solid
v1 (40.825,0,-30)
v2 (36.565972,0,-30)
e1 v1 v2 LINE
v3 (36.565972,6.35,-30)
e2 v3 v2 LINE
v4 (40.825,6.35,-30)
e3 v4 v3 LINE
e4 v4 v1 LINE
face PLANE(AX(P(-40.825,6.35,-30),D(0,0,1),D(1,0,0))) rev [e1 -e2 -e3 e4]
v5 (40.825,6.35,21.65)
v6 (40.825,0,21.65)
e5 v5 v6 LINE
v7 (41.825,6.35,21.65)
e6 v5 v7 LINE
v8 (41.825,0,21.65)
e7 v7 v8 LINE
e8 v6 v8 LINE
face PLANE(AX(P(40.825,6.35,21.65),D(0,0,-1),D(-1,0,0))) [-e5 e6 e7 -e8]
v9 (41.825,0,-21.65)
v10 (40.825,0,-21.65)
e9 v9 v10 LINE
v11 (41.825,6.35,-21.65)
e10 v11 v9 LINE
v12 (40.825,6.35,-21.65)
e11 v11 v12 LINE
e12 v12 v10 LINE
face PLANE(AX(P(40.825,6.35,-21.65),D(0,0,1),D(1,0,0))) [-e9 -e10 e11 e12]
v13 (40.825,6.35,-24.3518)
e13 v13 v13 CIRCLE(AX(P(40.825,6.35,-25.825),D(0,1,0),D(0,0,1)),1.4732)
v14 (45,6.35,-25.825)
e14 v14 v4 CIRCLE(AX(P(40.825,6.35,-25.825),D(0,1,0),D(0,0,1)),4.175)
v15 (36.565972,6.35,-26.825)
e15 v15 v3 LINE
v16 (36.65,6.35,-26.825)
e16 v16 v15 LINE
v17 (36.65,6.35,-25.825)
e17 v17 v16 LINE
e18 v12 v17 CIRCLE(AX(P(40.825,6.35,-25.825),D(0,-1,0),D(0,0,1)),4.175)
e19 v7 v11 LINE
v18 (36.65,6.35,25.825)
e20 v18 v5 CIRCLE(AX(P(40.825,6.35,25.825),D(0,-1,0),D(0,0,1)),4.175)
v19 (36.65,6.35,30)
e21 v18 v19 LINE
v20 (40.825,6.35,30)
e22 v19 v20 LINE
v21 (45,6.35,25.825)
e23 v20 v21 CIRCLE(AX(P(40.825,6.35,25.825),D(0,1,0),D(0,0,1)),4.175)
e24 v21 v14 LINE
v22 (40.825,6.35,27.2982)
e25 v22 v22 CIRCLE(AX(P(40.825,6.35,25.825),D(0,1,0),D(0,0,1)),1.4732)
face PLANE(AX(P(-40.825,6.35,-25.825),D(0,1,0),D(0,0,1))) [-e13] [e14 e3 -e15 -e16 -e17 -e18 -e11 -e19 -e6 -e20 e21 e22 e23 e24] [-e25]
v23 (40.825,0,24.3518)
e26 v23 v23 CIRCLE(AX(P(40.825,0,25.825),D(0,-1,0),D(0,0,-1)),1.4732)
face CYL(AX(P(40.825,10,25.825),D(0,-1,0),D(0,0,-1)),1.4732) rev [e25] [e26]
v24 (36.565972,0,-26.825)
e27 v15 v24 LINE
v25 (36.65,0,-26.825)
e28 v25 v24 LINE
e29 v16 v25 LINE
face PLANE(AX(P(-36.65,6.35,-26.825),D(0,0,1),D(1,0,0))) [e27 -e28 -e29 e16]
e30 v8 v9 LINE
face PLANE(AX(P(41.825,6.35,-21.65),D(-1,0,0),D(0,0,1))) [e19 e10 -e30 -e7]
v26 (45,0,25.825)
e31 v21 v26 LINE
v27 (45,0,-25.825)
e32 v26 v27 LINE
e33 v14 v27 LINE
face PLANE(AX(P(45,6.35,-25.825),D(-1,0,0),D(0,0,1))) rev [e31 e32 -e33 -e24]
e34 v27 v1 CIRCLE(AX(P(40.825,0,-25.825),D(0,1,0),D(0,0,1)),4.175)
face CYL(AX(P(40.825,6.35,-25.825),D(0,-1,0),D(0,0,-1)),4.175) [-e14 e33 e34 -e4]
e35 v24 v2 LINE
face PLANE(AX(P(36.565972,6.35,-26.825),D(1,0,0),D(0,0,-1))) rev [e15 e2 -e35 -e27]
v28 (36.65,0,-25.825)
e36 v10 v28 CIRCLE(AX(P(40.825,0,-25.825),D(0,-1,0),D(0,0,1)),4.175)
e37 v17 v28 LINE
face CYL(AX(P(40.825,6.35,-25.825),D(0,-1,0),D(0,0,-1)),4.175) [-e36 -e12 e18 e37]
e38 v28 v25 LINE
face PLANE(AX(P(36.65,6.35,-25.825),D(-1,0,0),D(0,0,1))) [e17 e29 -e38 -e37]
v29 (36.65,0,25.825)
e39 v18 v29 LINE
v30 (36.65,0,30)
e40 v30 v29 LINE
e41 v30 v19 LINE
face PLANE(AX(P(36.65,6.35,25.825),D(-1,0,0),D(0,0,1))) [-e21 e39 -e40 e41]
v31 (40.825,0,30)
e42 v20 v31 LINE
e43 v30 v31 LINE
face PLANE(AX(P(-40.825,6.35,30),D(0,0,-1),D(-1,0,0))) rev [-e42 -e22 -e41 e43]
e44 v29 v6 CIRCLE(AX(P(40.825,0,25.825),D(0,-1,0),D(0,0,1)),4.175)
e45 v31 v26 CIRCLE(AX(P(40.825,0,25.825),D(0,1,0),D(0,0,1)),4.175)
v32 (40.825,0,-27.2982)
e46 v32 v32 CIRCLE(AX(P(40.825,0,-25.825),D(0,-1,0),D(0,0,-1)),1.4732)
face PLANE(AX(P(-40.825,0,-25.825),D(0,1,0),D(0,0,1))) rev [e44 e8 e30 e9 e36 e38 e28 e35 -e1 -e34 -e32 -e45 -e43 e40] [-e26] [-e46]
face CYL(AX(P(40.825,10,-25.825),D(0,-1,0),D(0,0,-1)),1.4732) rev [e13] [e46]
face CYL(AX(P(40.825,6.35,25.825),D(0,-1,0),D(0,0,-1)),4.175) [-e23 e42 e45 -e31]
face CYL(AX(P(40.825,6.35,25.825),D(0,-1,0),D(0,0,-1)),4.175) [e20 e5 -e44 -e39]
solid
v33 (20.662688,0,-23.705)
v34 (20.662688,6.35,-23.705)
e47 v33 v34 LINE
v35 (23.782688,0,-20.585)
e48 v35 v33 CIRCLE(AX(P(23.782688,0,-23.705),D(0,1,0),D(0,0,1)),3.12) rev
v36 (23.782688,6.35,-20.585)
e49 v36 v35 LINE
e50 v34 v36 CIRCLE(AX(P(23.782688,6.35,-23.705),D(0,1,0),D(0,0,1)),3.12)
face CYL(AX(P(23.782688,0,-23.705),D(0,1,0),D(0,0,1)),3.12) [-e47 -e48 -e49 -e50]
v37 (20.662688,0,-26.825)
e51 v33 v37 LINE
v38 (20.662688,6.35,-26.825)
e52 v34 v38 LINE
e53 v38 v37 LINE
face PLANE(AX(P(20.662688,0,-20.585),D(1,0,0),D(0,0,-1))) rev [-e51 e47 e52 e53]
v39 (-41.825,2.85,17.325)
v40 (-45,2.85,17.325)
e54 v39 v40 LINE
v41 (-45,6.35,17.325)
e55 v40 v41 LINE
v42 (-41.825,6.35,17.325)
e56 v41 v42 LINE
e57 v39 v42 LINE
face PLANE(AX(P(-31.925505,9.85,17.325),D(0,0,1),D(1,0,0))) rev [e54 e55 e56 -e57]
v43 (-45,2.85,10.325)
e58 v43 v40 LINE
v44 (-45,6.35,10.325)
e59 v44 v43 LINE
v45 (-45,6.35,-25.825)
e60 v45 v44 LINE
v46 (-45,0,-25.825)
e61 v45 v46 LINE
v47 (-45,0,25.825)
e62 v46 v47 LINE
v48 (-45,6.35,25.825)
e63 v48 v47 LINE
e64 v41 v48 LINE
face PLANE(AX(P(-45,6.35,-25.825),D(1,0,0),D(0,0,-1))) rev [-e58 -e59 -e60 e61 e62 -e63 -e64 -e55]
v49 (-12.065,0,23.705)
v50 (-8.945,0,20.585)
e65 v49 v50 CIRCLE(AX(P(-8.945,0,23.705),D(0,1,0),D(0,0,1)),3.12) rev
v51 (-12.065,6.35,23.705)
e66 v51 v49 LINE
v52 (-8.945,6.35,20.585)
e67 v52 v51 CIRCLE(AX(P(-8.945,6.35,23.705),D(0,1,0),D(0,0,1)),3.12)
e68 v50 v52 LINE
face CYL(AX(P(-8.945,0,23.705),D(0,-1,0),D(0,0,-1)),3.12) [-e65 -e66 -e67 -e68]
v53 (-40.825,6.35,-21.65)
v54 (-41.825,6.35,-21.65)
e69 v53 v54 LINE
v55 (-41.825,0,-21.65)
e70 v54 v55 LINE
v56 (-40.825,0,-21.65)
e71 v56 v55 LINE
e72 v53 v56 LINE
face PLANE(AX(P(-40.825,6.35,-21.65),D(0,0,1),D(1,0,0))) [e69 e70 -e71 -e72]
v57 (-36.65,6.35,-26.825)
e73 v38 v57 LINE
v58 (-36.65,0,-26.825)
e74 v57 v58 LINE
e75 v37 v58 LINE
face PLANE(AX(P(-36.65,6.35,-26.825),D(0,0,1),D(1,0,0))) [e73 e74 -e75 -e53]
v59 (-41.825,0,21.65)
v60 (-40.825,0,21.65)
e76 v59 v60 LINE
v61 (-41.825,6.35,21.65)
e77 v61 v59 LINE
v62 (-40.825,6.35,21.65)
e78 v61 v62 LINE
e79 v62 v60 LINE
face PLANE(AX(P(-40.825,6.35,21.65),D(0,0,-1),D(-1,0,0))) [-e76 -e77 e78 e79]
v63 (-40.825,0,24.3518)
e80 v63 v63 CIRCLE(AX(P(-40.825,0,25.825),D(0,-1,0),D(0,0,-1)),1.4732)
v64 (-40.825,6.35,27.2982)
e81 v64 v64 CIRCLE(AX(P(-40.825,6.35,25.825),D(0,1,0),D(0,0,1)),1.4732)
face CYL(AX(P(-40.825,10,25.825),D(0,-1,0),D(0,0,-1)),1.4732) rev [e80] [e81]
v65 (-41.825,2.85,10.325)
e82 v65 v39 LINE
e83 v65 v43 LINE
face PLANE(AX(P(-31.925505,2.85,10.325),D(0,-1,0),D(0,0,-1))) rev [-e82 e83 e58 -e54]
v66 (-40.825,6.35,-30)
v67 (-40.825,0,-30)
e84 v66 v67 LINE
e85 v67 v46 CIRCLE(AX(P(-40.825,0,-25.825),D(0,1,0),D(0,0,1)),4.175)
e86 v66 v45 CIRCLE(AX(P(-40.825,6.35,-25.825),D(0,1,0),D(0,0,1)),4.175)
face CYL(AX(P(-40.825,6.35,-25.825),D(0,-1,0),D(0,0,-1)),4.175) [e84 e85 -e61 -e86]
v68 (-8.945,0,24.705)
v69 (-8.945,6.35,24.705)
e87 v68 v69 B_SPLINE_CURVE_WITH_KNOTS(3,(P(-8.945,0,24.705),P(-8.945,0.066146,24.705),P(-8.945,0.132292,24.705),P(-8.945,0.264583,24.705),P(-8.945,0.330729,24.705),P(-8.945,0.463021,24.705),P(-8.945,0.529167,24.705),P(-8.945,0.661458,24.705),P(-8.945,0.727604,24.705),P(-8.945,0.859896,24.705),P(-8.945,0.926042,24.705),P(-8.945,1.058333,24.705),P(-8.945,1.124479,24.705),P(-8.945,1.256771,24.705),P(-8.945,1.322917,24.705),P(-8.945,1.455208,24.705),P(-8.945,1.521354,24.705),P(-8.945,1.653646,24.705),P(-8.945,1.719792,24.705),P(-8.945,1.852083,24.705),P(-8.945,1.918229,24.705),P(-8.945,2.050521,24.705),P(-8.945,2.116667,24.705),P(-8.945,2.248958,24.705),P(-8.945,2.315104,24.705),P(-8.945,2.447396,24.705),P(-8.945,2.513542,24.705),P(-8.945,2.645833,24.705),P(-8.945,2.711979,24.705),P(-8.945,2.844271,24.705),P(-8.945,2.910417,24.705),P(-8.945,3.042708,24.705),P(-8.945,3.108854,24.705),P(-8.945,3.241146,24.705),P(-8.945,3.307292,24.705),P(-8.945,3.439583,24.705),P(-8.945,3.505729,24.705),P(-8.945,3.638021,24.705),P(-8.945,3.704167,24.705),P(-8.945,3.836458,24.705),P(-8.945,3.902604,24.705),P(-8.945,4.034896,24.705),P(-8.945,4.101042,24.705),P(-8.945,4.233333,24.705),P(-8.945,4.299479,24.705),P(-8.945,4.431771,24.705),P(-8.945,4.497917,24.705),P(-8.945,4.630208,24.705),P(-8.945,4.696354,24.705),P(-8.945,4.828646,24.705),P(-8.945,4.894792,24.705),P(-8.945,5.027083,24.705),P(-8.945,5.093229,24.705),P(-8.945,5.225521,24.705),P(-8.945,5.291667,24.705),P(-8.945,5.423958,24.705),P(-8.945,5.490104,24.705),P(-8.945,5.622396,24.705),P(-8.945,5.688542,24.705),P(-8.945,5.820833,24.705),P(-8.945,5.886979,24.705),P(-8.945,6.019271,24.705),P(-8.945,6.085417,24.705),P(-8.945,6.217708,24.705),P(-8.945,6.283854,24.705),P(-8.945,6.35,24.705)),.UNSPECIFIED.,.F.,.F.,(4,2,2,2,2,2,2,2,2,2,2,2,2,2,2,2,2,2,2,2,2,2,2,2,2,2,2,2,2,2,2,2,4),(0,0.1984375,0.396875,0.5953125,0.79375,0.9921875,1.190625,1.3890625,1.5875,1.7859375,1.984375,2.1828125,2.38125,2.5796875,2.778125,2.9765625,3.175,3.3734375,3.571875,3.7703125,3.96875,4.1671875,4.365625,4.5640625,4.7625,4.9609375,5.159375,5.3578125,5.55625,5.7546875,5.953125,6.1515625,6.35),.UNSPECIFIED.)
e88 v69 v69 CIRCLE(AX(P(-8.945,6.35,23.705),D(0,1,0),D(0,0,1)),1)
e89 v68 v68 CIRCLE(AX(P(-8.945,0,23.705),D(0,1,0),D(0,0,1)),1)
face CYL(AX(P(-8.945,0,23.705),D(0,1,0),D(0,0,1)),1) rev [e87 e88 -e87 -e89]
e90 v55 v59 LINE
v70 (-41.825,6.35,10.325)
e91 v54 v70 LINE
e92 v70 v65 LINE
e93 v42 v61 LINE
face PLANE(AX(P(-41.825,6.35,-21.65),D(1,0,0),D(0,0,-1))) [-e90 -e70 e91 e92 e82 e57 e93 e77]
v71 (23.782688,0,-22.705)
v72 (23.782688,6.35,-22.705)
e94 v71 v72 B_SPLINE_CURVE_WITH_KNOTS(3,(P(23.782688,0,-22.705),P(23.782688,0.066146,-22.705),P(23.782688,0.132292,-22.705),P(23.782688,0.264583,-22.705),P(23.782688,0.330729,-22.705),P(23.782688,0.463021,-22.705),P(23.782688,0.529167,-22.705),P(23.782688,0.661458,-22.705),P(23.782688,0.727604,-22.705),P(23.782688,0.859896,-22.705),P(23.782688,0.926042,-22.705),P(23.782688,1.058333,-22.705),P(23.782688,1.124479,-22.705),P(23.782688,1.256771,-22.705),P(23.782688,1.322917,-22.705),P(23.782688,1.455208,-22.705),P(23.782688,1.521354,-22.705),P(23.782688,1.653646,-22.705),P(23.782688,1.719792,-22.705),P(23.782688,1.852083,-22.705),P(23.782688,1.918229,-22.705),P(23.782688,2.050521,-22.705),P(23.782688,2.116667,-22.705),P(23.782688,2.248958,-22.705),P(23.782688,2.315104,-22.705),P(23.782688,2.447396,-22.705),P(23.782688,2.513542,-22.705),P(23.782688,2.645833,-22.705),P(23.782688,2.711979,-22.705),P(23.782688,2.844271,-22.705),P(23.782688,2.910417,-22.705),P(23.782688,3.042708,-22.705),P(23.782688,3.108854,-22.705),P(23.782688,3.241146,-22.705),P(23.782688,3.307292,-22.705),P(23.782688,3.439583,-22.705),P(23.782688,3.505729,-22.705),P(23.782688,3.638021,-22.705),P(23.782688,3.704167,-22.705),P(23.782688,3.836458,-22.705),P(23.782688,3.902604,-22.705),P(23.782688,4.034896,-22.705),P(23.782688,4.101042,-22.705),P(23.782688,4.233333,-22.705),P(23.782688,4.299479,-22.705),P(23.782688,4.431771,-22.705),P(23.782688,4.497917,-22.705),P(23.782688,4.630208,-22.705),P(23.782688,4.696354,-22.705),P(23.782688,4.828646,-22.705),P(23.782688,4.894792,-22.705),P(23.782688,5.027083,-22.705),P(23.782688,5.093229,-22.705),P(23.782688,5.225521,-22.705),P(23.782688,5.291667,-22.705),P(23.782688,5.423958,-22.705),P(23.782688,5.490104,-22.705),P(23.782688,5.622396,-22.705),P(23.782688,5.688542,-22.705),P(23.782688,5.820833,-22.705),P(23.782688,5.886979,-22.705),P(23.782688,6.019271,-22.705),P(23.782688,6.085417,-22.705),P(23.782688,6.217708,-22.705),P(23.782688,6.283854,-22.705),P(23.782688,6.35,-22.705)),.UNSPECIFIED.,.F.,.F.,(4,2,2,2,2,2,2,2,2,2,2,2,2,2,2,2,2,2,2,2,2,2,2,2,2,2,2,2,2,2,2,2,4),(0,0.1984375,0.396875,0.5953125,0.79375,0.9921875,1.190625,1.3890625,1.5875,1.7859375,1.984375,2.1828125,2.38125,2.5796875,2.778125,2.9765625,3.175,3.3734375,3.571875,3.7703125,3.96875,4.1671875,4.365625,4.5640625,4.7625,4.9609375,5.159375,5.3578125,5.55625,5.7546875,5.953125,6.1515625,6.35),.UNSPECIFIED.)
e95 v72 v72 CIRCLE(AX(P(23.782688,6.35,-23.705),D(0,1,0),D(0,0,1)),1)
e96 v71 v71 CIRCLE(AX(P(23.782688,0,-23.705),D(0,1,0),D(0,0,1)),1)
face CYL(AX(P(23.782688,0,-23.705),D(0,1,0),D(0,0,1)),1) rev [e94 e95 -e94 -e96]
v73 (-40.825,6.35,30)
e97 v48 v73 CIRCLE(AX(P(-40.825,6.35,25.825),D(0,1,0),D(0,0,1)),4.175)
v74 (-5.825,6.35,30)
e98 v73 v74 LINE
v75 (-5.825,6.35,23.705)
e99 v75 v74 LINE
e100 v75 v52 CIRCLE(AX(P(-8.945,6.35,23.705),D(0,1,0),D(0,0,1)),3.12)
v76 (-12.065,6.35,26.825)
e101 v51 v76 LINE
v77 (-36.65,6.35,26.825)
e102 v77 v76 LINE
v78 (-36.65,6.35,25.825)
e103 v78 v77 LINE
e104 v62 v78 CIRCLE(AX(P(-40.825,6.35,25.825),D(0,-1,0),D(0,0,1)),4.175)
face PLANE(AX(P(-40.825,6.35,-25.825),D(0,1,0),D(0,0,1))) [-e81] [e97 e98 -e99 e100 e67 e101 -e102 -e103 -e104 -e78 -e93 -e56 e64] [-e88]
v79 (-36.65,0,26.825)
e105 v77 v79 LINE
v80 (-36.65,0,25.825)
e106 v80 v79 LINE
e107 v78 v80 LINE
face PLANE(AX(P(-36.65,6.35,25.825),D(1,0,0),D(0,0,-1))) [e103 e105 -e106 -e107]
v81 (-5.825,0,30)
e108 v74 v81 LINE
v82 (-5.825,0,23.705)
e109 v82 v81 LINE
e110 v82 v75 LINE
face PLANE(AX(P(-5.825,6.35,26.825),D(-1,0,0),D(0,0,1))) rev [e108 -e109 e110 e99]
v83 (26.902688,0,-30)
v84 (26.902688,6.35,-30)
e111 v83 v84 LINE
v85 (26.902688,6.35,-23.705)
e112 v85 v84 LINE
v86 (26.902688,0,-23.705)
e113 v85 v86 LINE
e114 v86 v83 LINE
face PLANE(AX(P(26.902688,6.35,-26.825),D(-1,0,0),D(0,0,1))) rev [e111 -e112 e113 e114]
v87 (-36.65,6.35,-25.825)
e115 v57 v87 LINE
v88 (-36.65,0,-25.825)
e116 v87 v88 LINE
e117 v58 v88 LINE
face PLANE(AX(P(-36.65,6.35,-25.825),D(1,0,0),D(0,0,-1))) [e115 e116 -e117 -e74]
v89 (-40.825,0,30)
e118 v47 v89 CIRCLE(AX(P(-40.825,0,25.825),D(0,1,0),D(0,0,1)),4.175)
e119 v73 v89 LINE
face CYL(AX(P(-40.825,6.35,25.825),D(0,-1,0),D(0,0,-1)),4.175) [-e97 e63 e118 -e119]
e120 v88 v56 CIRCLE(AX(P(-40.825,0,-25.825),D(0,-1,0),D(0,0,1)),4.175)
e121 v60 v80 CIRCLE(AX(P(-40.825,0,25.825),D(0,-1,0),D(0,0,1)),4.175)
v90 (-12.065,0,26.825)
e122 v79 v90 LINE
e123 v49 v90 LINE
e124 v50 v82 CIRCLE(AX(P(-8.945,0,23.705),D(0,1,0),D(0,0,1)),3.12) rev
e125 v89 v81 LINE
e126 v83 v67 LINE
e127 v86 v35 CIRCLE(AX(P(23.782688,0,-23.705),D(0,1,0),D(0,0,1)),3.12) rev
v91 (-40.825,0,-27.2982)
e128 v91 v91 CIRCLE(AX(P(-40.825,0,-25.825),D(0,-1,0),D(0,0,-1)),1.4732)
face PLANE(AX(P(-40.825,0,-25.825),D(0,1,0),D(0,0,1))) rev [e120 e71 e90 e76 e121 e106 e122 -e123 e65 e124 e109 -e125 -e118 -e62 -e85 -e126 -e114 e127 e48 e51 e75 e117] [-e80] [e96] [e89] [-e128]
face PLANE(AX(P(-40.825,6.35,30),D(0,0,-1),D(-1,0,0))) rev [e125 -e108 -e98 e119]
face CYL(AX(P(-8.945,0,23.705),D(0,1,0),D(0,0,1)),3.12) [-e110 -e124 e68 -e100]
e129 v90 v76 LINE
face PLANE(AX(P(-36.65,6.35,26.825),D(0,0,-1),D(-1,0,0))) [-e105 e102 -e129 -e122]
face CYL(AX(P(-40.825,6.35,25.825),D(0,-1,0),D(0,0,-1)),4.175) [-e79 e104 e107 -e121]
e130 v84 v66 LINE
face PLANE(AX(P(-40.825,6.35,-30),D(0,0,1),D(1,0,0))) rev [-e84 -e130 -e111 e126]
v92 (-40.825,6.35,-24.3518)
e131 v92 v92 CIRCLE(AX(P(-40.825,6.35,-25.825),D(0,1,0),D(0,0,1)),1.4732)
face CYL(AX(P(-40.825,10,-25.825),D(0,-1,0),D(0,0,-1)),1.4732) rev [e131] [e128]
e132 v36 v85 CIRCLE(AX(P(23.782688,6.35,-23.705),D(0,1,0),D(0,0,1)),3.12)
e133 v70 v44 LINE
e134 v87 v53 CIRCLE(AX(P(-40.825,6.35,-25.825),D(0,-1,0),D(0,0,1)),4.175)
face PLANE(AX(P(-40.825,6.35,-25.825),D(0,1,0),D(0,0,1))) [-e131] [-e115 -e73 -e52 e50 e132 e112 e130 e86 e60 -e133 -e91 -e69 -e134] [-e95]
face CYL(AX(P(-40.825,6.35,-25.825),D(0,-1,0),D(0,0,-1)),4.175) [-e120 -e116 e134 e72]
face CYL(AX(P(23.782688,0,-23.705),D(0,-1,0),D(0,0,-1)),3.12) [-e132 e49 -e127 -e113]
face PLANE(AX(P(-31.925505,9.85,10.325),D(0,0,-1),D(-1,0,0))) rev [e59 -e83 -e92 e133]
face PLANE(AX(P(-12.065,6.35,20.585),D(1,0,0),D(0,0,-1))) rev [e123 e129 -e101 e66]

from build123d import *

# Parameters (mm, degrees)
BOSS_EXTRUDE3_DEPTH = 6.35
SKETCH3_W           = 9.663283239
SKETCH3_H           = 6.35
CUT_EXTRUDE1_DEPTH  = 3.175
SKETCH4_W           = 42.475
SKETCH4_H           = 6.35
CUT_EXTRUDE2_DEPTH  = 8.35
SKETCH5_W           = 7
SKETCH5_H           = 7
CUT_EXTRUDE3_DEPTH  = 3.175
SKETCH7_R           = 1.4732
CUT_EXTRUDE4_DEPTH  = 10
SKETCH10_W          = 6.24
SKETCH10_H          = 6.35
BOSS_EXTRUDE4_DEPTH = 6.24
SKETCH11_W          = 6.24
SKETCH11_H          = 6.35
BOSS_EXTRUDE5_DEPTH = 6.24
SKETCH12_R          = 1
CUT_EXTRUDE5_DEPTH  = 55.454774814
SKETCH13_R          = 1
CUT_EXTRUDE6_DEPTH  = 55.454774814
FILLET1_R           = 3.12


with BuildPart() as part:
    # Sketch2 → Boss-Extrude3 (new body)
    with BuildSketch(Plane(origin=(0, 0, 0), x_dir=(1, 0, 0), z_dir=(0, 1, 0))):
        with BuildLine():
            Line((-45, 25.825), (-45, -25.825))
            ThreePointArc((-45, -25.825), (-43.777170811, -28.777170811), (-40.825, -30))
            Line((-40.825, -30), (40.825, -30))
            ThreePointArc((40.825, -30), (43.777170811, -28.777170811), (45, -25.825))
            Line((45, -25.825), (45, 25.825))
            ThreePointArc((45, 25.825), (43.777170811, 28.777170811), (40.825, 30))
            Line((40.825, 30), (-40.825, 30))
            ThreePointArc((-40.825, 30), (-43.777170811, 28.777170811), (-45, 25.825))
        make_face()
        with BuildLine():
            Line((40.825, 21.65), (41.825, 21.65))
            Line((41.825, 21.65), (41.825, -21.65))
            Line((41.825, -21.65), (40.825, -21.65))
            ThreePointArc((40.825, -21.65), (37.872829189, -22.872829189), (36.65, -25.825))
            Line((36.65, -25.825), (36.65, -26.825))
            Line((36.65, -26.825), (-36.65, -26.825))
            Line((-36.65, -26.825), (-36.65, -25.825))
            ThreePointArc((-36.65, -25.825), (-37.872829189, -22.872829189), (-40.825, -21.65))
            Line((-40.825, -21.65), (-41.825, -21.65))
            Line((-41.825, -21.65), (-41.825, 21.65))
            Line((-41.825, 21.65), (-40.825, 21.65))
            ThreePointArc((-40.825, 21.65), (-37.872829189, 22.872829189), (-36.65, 25.825))
            Line((-36.65, 25.825), (-36.65, 26.825))
            Line((-36.65, 26.825), (36.65, 26.825))
            Line((36.65, 26.825), (36.65, 25.825))
            ThreePointArc((36.65, 25.825), (37.872829189, 22.872829189), (40.825, 21.65))
        make_face(mode=Mode.SUBTRACT)
    extrude(amount=BOSS_EXTRUDE3_DEPTH)

    # Sketch3 → Cut-Extrude1 (cut)
    with BuildSketch(Plane(origin=(0, 0, -30), x_dir=(-1, 0, 0), z_dir=(0, 0, -1))):
        with Locations((-31.734329903, 3.175)):
            Rectangle(SKETCH3_W, SKETCH3_H)
    extrude(amount=-CUT_EXTRUDE1_DEPTH, mode=Mode.SUBTRACT)

    # Sketch4 → Cut-Extrude2 (cut)
    with BuildSketch(Plane.XY.offset(30)):
        with Locations((15.4125, 3.175)):
            Rectangle(SKETCH4_W, SKETCH4_H)
    extrude(amount=-CUT_EXTRUDE2_DEPTH, mode=Mode.SUBTRACT)


with BuildPart() as cut_extrude2_piece_1:
    # of the separate pieces the step leaves, piece 1, a body of its own (cut_extrude2_pieces)
    add(part.part.solids().sort_by_distance((-40.825, 0, 30))[0])

    # Sketch5 → Cut-Extrude3 (cut)
    with BuildSketch(Plane.ZY.offset(45)):
        with Locations((13.825, 6.35)):
            Rectangle(SKETCH5_W, SKETCH5_H)
    extrude(amount=-CUT_EXTRUDE3_DEPTH, mode=Mode.SUBTRACT)


with BuildPart() as cut_extrude2_piece_2:
    # of the separate pieces the step leaves, piece 2, a body of its own (cut_extrude2_pieces)
    add(part.part.solids().sort_by_distance((40.825, 0, -30))[0])


with BuildPart() as cut_extrude4_tool:
    # Sketch7 → Cut-Extrude4 (new body)
    with BuildSketch(Plane.XZ):
        with Locations(Location((-40.825, -25.825, 0), (0, 0, 270))):
            Circle(SKETCH7_R)
        with Locations(Location((-40.825, 25.825, 0), (0, 0, 270))):
            Circle(SKETCH7_R)
        with Locations(Location((40.825, 25.825, 0), (0, 0, 270))):
            Circle(SKETCH7_R)
        with Locations(Location((40.825, -25.825, 0), (0, 0, 270))):
            Circle(SKETCH7_R)
    extrude(amount=-CUT_EXTRUDE4_DEPTH)


with BuildPart() as cut_extrude2_piece_1_1:
    add(cut_extrude2_piece_1.part)

    # Cut-Extrude4: cut by cut_extrude4_tool
    add(cut_extrude4_tool.part, mode=Mode.SUBTRACT)

    # Sketch10 → Boss-Extrude4 (add)
    with BuildSketch(Plane(origin=(0, 0, 26.825), x_dir=(-1, 0, 0), z_dir=(0, 0, -1))):
        with Locations((8.945, 3.175)):
            Rectangle(SKETCH10_W, SKETCH10_H)
    extrude(amount=BOSS_EXTRUDE4_DEPTH)

    # Sketch11 → Boss-Extrude5 (add)
    with BuildSketch(Plane.XY.offset(-26.825)):
        with Locations((23.782688283, 3.175)):
            Rectangle(SKETCH11_W, SKETCH11_H)
    extrude(amount=BOSS_EXTRUDE5_DEPTH)

    # Sketch12 → Cut-Extrude5 (cut, through all)
    with BuildSketch(Plane(origin=(0, 6.35, 0), x_dir=(1, 0, 0), z_dir=(0, 1, 0))):
        with Locations(Location((23.782688283, 23.705, 0), (0, 0, 270))):
            Circle(SKETCH12_R)
    extrude(amount=-CUT_EXTRUDE5_DEPTH, mode=Mode.SUBTRACT)

    # Sketch13 → Cut-Extrude6 (cut, through all)
    with BuildSketch(Plane(origin=(0, 6.35, 0), x_dir=(1, 0, 0), z_dir=(0, 1, 0))):
        with Locations(Location((-8.945, -23.705, 0), (0, 0, 270))):
            Circle(SKETCH13_R)
    extrude(amount=-CUT_EXTRUDE6_DEPTH, mode=Mode.SUBTRACT)

    # Fillet1
    fillet1_edges = [cut_extrude2_piece_1_1.edges().sort_by_distance(p)[0] for p in [
        (26.902688283, 3.175, -20.585),
        (20.662688283, 3.175, -20.585),
        (-5.825, 3.175, 20.585),
        (-12.065, 3.175, 20.585),
    ]]
    fillet(fillet1_edges, radius=FILLET1_R - 0.0001)  # a hair under: the kernel refuses the full size


with BuildPart() as cut_extrude2_piece_2_1:
    add(cut_extrude2_piece_2.part)

    # Cut-Extrude4: cut by cut_extrude4_tool
    add(cut_extrude4_tool.part, mode=Mode.SUBTRACT)


solid = Compound([cut_extrude2_piece_1_1.part, cut_extrude2_piece_2_1.part])
